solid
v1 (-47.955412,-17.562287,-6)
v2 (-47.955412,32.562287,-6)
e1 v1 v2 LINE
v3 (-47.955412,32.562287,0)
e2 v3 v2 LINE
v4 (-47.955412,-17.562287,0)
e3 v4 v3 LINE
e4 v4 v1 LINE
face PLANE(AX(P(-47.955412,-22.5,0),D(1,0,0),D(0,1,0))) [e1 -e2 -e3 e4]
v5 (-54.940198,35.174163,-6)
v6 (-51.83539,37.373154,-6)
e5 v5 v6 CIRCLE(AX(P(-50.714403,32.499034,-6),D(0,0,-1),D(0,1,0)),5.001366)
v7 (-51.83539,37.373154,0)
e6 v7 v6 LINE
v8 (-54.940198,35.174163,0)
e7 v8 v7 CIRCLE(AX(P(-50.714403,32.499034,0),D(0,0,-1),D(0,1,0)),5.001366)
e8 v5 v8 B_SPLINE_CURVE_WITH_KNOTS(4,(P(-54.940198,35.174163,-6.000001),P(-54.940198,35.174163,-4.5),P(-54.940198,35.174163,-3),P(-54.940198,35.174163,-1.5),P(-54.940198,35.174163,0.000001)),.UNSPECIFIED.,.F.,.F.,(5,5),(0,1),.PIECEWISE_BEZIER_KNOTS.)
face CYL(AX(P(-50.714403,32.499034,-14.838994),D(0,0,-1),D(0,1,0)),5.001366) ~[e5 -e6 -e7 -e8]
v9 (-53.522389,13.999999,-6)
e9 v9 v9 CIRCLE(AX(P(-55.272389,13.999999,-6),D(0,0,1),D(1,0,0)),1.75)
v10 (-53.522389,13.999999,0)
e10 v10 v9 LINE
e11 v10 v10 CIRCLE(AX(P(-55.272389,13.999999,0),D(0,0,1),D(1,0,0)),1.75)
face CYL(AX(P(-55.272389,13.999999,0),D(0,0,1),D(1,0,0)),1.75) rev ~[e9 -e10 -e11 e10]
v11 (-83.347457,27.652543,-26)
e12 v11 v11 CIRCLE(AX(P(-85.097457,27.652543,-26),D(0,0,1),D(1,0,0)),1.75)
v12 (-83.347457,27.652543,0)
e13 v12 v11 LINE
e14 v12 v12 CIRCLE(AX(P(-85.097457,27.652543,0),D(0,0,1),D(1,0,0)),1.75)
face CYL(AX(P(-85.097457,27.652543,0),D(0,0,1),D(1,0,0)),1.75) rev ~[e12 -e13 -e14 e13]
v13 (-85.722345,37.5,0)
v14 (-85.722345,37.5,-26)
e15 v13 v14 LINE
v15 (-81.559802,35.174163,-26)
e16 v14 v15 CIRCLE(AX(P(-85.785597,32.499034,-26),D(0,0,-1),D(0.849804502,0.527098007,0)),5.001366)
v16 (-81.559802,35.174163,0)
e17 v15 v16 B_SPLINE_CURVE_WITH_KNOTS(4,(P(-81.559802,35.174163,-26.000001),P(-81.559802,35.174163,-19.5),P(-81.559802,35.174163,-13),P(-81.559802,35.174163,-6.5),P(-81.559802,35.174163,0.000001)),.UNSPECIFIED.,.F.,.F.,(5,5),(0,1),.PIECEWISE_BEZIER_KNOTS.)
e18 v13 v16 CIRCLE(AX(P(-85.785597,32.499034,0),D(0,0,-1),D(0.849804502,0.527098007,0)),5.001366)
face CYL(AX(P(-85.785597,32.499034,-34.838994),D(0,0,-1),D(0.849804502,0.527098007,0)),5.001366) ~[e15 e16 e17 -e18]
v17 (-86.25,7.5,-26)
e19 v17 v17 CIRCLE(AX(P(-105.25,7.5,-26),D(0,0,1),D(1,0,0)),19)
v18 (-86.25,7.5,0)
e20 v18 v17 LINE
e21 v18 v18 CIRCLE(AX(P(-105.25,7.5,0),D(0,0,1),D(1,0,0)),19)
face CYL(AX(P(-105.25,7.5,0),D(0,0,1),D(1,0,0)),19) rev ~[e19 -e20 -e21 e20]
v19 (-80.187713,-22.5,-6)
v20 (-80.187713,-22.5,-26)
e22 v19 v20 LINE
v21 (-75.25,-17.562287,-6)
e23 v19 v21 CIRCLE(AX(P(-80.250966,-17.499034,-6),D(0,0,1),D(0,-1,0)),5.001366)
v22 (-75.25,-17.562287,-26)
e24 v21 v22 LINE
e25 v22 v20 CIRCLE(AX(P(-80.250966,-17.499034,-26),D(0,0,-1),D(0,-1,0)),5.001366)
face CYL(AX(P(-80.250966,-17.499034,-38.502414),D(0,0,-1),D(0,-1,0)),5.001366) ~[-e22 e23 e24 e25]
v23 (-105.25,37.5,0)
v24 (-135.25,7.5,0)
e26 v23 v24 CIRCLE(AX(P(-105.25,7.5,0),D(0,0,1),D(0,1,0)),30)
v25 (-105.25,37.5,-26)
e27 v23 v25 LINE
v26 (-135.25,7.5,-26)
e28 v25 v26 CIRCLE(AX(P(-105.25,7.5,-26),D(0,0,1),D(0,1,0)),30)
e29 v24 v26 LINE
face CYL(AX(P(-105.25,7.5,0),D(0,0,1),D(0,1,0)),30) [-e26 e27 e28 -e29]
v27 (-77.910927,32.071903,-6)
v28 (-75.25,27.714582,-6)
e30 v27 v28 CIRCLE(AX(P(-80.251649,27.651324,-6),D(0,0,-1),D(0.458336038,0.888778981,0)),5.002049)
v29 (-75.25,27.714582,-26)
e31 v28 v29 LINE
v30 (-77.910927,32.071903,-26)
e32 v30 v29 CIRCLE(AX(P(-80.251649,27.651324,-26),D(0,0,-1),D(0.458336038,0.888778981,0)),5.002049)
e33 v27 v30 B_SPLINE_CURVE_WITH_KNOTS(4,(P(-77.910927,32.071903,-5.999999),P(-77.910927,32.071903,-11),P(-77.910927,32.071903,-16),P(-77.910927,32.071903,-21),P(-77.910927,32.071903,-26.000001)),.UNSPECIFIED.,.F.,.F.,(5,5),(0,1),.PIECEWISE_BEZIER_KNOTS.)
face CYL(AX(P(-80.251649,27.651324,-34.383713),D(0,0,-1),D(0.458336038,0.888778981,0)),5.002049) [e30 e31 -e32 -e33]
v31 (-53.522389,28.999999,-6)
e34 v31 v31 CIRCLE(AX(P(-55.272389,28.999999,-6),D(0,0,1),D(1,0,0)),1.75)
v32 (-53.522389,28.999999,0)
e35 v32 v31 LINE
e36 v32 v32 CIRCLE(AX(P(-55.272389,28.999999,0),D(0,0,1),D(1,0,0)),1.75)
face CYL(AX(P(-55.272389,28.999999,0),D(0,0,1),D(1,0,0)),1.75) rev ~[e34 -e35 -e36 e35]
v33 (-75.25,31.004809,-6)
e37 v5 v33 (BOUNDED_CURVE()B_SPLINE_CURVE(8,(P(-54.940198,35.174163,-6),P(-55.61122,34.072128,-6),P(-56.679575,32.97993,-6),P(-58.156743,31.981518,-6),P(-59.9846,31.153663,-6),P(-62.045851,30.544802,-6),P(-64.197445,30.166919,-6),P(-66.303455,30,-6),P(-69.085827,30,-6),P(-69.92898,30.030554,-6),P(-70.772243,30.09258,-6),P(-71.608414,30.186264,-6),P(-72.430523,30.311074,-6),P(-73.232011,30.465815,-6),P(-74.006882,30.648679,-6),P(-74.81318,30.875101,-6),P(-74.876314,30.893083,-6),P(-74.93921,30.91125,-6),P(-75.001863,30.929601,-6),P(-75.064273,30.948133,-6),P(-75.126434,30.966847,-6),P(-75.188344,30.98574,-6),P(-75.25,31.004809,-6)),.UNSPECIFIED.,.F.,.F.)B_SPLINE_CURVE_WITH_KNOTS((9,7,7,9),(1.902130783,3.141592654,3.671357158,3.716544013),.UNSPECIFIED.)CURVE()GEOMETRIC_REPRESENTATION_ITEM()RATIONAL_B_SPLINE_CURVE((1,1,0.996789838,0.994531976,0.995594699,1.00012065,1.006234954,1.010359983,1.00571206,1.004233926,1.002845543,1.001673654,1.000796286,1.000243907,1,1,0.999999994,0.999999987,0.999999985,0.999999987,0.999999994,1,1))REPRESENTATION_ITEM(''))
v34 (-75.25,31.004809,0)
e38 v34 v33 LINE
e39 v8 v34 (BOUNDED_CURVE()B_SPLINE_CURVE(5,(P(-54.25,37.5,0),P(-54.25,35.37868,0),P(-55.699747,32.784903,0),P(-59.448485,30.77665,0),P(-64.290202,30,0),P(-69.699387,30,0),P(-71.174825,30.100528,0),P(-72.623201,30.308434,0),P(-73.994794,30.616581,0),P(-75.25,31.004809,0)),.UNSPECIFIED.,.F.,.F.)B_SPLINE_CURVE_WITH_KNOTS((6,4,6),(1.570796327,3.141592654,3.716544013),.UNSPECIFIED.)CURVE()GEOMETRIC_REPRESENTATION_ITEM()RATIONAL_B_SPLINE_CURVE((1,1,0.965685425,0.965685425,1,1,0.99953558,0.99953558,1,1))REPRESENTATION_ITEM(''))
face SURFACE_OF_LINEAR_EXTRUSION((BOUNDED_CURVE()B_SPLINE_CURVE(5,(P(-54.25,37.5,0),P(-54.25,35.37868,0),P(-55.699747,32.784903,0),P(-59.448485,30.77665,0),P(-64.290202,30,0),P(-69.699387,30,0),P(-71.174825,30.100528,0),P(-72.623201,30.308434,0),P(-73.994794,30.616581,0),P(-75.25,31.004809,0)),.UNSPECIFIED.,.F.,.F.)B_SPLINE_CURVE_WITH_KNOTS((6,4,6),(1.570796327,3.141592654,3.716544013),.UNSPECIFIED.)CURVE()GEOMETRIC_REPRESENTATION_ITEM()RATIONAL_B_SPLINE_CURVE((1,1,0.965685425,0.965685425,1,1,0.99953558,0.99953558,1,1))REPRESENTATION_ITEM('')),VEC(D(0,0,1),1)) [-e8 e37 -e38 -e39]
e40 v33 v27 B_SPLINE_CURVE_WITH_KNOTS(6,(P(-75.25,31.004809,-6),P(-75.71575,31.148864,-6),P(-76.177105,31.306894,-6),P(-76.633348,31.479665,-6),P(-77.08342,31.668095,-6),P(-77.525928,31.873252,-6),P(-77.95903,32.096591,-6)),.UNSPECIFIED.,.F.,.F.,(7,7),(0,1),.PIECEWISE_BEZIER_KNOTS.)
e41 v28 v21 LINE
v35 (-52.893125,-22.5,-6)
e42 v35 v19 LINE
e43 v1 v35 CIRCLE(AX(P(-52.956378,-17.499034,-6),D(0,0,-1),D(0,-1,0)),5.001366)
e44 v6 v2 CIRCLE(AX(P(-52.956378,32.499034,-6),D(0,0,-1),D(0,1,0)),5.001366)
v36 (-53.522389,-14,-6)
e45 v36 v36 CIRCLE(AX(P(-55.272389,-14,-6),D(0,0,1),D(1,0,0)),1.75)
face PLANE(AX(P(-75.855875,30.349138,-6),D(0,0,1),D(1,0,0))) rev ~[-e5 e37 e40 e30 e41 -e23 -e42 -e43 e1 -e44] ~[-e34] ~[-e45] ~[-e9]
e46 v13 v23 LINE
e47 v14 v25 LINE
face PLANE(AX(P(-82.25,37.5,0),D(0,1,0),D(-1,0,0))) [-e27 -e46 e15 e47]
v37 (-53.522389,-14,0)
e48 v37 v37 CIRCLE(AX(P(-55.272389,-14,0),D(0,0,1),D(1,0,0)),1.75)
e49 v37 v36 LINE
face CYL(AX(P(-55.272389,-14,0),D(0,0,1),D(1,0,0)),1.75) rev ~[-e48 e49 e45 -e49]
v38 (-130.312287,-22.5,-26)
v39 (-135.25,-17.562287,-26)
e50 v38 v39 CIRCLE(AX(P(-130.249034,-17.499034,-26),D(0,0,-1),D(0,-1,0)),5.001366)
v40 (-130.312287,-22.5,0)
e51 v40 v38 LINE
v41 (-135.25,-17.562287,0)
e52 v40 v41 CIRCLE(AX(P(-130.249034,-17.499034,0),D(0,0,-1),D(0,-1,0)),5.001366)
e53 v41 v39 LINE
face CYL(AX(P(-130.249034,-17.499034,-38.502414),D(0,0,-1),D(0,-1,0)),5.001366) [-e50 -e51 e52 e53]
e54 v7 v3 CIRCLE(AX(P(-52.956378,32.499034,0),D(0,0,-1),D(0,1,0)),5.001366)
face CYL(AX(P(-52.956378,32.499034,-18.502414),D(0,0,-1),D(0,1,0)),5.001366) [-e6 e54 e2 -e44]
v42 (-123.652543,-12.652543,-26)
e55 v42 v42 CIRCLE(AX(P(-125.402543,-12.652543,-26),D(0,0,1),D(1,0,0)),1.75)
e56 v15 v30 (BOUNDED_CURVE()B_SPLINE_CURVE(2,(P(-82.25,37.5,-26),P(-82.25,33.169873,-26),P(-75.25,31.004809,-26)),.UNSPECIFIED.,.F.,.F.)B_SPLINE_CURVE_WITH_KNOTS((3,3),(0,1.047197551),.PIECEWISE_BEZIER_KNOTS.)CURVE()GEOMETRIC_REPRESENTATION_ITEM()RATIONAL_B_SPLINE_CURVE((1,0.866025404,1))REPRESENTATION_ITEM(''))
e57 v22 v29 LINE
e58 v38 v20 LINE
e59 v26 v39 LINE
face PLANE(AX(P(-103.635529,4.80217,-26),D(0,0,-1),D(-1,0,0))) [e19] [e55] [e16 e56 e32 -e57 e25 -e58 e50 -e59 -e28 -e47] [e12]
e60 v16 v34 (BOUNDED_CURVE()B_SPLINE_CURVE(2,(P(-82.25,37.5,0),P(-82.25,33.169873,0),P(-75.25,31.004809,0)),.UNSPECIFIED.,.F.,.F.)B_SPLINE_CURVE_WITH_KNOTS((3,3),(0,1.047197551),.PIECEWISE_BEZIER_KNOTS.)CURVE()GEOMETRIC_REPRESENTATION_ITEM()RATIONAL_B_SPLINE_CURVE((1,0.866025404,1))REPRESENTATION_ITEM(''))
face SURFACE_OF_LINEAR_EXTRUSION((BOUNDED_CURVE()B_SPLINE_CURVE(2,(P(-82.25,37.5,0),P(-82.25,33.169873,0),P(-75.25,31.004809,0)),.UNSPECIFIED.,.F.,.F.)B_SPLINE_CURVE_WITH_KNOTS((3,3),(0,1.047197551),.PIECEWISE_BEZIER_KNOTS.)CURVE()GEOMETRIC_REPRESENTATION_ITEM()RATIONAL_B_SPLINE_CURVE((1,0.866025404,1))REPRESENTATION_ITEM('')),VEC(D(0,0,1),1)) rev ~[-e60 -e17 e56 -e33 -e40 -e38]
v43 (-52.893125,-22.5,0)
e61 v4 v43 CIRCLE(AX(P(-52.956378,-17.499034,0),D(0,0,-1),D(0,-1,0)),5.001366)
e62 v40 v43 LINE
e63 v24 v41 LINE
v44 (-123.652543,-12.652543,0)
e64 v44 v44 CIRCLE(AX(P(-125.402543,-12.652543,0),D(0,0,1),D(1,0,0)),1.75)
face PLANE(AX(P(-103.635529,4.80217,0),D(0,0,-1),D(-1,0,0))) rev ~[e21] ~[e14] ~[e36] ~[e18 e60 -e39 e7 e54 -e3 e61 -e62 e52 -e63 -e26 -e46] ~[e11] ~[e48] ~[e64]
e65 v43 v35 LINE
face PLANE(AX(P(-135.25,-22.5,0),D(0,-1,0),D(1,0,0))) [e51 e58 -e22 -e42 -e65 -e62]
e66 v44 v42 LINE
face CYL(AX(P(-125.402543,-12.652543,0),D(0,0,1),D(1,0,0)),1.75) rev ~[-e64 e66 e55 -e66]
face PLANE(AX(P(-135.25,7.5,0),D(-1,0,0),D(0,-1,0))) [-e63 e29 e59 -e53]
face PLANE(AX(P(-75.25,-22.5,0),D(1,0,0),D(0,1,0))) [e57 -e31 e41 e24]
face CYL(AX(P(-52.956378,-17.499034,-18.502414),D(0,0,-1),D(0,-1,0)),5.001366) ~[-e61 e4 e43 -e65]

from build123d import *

# Parameters (mm, degrees)
F0_R         = 1.75
F1_DEPTH     = 6
F0_R_2       = 19
F2_DEPTH     = 26
F3_T1_DEPTH  = 51.0048285071
F3_T3_DEPTH  = 32.5024142536
F3_T5_DEPTH  = 23.67798751
F3_T7_DEPTH  = 31.0048285071
F3_T9_DEPTH  = 43.67798751
F3_T11_DEPTH = 28.3837127694


# Not quite as in the source:
# - a fillet or chamfer that OpenCascade refuses, or shapes differently, is made with other operations: its cross-section is extruded or revolved along the edge and cut away or added


with BuildPart() as f1:
    # F0 (on Top) → F1 (new body)
    with BuildSketch(Plane.XY):
        with BuildLine():
            Line((-47.9554124177, 37.5), (-54.25, 37.5))
            add(Edge.make_bspline(
                [(-68.25, 30), (-54.25, 30), (-54.25, 37.5)],
                knots=[1.5707963268, 1.5707963268, 1.5707963268, 3.1415926536, 3.1415926536, 3.1415926536], degree=2, weights=[1, 0.7071067812, 1]))
            Line((-68.25, 30), (-68.25, -22.5))
            Line((-68.25, -22.5), (-47.9554124177, -22.5))
            Line((-47.9554124177, -22.5), (-47.9554124177, 37.5))
        make_face()
        with Locations((-55.2723892033, -14)):
            Circle(F0_R, mode=Mode.SUBTRACT)
        with Locations((-55.2723892033, 13.9999985695)):
            Circle(F0_R, mode=Mode.SUBTRACT)
        with Locations((-55.2723892033, 28.9999985695)):
            Circle(F0_R, mode=Mode.SUBTRACT)
        with BuildLine():
            Line((-68.25, -22.5), (-68.25, 30))
            add(Edge.make_bspline(
                [(-75.25, 31.0048094716), (-72.001288694, 30), (-68.25, 30)],
                knots=[1.0471975512, 1.0471975512, 1.0471975512, 1.5707963268, 1.5707963268, 1.5707963268], degree=2, weights=[1, 0.9659258263, 1]))
            Line((-75.25, 31.0048094716), (-75.25, 30))
            Line((-75.25, 30), (-75.25, -22.5))
            Line((-75.25, -22.5), (-68.25, -22.5))
        make_face()
    extrude(amount=-F1_DEPTH)

    # F0 (on Top) → F2 (join)
    with BuildSketch(Plane.XY):
        with BuildLine():
            add(Edge.make_bspline(
                [(-82.25, 37.5), (-82.25, 33.1698729811), (-75.25, 31.0048094716)],
                knots=[0, 0, 0, 1.0471975512, 1.0471975512, 1.0471975512], degree=2, weights=[1, 0.8660254038, 1]))
            Line((-82.25, 37.5), (-105.25, 37.5))
            ThreePointArc((-105.25, 37.5), (-126.4632034356, 28.7132034356), (-135.25, 7.5))
            Line((-135.25, 7.5), (-135.25, -22.5))
            Line((-135.25, -22.5), (-75.25, -22.5))
            Line((-75.25, -22.5), (-75.25, 30))
            Line((-75.25, 30), (-75.25, 31.0048094716))
        make_face()
        with Locations((-125.4025432638, -12.6525432638)):
            Circle(F0_R, mode=Mode.SUBTRACT)
        with Locations((-105.25, 7.5)):
            Circle(F0_R_2, mode=Mode.SUBTRACT)
        with Locations((-85.0974567362, 27.6525432638)):
            Circle(F0_R, mode=Mode.SUBTRACT)
    extrude(amount=-F2_DEPTH)

    # F3: fillet of radius 5 on 8 edges, made by hand

    # F3_s2 → F3_t1 (cut)
    with BuildSketch(Plane.XY.offset(-38.5024142536)):
        with BuildLine():
            ThreePointArc((-130.2490343146, -22.5004), (-133.7855339059, -21.0355339059), (-135.2504, -17.4990343146))
            Line((-135.2504, -17.4990343146), (-135.7505365685, -17.4990343146))
            ThreePointArc((-135.7505365685, -17.4990343146), (-135.7501365685, -19.9995171573), (-135.7501365685, -22.5))
            Line((-135.7501365685, -22.5), (-135.25, -23.0001365685))
            ThreePointArc((-135.25, -23.0001365685), (-132.7495171573, -23.0001365685), (-130.2490343146, -23.0005365685))
            Line((-130.2490343146, -23.0005365685), (-130.2490343146, -22.5004))
        make_face()
    extrude(amount=F3_T1_DEPTH, mode=Mode.SUBTRACT)

    # F3_s4 → F3_t3 (cut)
    with BuildSketch(Plane.XY.offset(-38.5024142536)):
        with BuildLine():
            ThreePointArc((-80.2509656854, -22.5004), (-76.7144660941, -21.0355339059), (-75.2496, -17.4990343146))
            Line((-75.2496, -17.4990343146), (-74.7494634315, -17.4990343146))
            ThreePointArc((-74.7494634315, -17.4990343146), (-74.7498634315, -19.9995171573), (-74.7498634315, -22.5))
            Line((-74.7498634315, -22.5), (-75.25, -23.0001365685))
            ThreePointArc((-75.25, -23.0001365685), (-77.7504828427, -23.0001365685), (-80.2509656854, -23.0005365685))
            Line((-80.2509656854, -23.0005365685), (-80.2509656854, -22.5004))
        make_face()
    extrude(amount=F3_T3_DEPTH, mode=Mode.SUBTRACT)

    # F3_s6 → F3_t5 (cut)
    with BuildSketch(Plane.XY.offset(-14.838993755)):
        with BuildLine():
            ThreePointArc((-50.7144025206, 37.5004), (-53.1463779594, 36.8692922228), (-54.9645855955, 35.1352441979))
            Line((-54.9645855955, 35.1352441979), (-55.389603903, 35.3988651863))
            ThreePointArc((-55.389603903, 35.3988651863), (-54.9183796159, 36.414502766), (-54.7501365685, 37.5))
            Line((-54.7501365685, 37.5), (-54.25, 38.0001365685))
            ThreePointArc((-54.25, 38.0001365685), (-52.4822012603, 38.0001365685), (-50.7144025206, 38.0005365685))
            Line((-50.7144025206, 38.0005365685), (-50.7144025206, 37.5004))
        make_face()
    extrude(amount=F3_T5_DEPTH, mode=Mode.SUBTRACT)

    # F3_s8 → F3_t7 (cut)
    with BuildSketch(Plane.XY.offset(-18.5024142536)):
        with BuildLine():
            ThreePointArc((-52.9563781031, 37.5004), (-49.4198785117, 36.0355339059), (-47.9550124177, 32.4990343146))
            Line((-47.9550124177, 32.4990343146), (-47.4548758491, 32.4990343146))
            ThreePointArc((-47.4548758491, 32.4990343146), (-47.4552758491, 34.9995171573), (-47.4552758491, 37.5))
            Line((-47.4552758491, 37.5), (-47.9554124177, 38.0001365685))
            ThreePointArc((-47.9554124177, 38.0001365685), (-50.4558952604, 38.0001365685), (-52.9563781031, 38.0005365685))
            Line((-52.9563781031, 38.0005365685), (-52.9563781031, 37.5004))
        make_face()
        with BuildLine():
            ThreePointArc((-52.9563781031, -22.5004), (-49.4198785117, -21.0355339059), (-47.9550124177, -17.4990343146))
            Line((-47.9550124177, -17.4990343146), (-47.4548758491, -17.4990343146))
            ThreePointArc((-47.4548758491, -17.4990343146), (-47.4552758491, -19.9995171573), (-47.4552758491, -22.5))
            Line((-47.4552758491, -22.5), (-47.9554124177, -23.0001365685))
            ThreePointArc((-47.9554124177, -23.0001365685), (-50.4558952604, -23.0001365685), (-52.9563781031, -23.0005365685))
            Line((-52.9563781031, -23.0005365685), (-52.9563781031, -22.5004))
        make_face()
    extrude(amount=F3_T7_DEPTH, mode=Mode.SUBTRACT)

    # F3_s10 → F3_t9 (cut)
    with BuildSketch(Plane.XY.offset(-34.838993755)):
        with BuildLine():
            ThreePointArc((-81.5354144045, 35.1352441979), (-83.3536220406, 36.8692922228), (-85.7855974794, 37.5004))
            Line((-85.7855974794, 37.5004), (-85.7855974794, 38.0005365685))
            ThreePointArc((-85.7855974794, 38.0005365685), (-84.0177987397, 38.0001365685), (-82.25, 38.0001365685))
            Line((-82.25, 38.0001365685), (-81.7498634315, 37.5))
            ThreePointArc((-81.7498634315, 37.5), (-81.5816203841, 36.414502766), (-81.110396097, 35.3988651863))
            Line((-81.110396097, 35.3988651863), (-81.5354144045, 35.1352441979))
        make_face()
    extrude(amount=F3_T9_DEPTH, mode=Mode.SUBTRACT)

    # F3_s12 → F3_t11 (cut)
    with BuildSketch(Plane.XY.offset(-34.3837127694)):
        with BuildLine():
            ThreePointArc((-77.9590299164, 32.0970407857), (-75.9803326171, 30.2544669483), (-75.2496, 27.6513243877))
            Line((-75.2496, 27.6513243877), (-74.7493950565, 27.6513243877))
            ThreePointArc((-74.7493950565, 27.6513243877), (-74.7497950565, 29.3280669297), (-74.7497950565, 31.0048094716))
            Line((-74.7497950565, 31.0048094716), (-75.1021974152, 31.4826790996))
            ThreePointArc((-75.1021974152, 31.4826790996), (-76.4425248665, 31.9557259843), (-77.7297679646, 32.5416124255))
            Line((-77.7297679646, 32.5416124255), (-77.9590299164, 32.0970407857))
        make_face()
    extrude(amount=F3_T11_DEPTH, mode=Mode.SUBTRACT)


solid = f1.part
